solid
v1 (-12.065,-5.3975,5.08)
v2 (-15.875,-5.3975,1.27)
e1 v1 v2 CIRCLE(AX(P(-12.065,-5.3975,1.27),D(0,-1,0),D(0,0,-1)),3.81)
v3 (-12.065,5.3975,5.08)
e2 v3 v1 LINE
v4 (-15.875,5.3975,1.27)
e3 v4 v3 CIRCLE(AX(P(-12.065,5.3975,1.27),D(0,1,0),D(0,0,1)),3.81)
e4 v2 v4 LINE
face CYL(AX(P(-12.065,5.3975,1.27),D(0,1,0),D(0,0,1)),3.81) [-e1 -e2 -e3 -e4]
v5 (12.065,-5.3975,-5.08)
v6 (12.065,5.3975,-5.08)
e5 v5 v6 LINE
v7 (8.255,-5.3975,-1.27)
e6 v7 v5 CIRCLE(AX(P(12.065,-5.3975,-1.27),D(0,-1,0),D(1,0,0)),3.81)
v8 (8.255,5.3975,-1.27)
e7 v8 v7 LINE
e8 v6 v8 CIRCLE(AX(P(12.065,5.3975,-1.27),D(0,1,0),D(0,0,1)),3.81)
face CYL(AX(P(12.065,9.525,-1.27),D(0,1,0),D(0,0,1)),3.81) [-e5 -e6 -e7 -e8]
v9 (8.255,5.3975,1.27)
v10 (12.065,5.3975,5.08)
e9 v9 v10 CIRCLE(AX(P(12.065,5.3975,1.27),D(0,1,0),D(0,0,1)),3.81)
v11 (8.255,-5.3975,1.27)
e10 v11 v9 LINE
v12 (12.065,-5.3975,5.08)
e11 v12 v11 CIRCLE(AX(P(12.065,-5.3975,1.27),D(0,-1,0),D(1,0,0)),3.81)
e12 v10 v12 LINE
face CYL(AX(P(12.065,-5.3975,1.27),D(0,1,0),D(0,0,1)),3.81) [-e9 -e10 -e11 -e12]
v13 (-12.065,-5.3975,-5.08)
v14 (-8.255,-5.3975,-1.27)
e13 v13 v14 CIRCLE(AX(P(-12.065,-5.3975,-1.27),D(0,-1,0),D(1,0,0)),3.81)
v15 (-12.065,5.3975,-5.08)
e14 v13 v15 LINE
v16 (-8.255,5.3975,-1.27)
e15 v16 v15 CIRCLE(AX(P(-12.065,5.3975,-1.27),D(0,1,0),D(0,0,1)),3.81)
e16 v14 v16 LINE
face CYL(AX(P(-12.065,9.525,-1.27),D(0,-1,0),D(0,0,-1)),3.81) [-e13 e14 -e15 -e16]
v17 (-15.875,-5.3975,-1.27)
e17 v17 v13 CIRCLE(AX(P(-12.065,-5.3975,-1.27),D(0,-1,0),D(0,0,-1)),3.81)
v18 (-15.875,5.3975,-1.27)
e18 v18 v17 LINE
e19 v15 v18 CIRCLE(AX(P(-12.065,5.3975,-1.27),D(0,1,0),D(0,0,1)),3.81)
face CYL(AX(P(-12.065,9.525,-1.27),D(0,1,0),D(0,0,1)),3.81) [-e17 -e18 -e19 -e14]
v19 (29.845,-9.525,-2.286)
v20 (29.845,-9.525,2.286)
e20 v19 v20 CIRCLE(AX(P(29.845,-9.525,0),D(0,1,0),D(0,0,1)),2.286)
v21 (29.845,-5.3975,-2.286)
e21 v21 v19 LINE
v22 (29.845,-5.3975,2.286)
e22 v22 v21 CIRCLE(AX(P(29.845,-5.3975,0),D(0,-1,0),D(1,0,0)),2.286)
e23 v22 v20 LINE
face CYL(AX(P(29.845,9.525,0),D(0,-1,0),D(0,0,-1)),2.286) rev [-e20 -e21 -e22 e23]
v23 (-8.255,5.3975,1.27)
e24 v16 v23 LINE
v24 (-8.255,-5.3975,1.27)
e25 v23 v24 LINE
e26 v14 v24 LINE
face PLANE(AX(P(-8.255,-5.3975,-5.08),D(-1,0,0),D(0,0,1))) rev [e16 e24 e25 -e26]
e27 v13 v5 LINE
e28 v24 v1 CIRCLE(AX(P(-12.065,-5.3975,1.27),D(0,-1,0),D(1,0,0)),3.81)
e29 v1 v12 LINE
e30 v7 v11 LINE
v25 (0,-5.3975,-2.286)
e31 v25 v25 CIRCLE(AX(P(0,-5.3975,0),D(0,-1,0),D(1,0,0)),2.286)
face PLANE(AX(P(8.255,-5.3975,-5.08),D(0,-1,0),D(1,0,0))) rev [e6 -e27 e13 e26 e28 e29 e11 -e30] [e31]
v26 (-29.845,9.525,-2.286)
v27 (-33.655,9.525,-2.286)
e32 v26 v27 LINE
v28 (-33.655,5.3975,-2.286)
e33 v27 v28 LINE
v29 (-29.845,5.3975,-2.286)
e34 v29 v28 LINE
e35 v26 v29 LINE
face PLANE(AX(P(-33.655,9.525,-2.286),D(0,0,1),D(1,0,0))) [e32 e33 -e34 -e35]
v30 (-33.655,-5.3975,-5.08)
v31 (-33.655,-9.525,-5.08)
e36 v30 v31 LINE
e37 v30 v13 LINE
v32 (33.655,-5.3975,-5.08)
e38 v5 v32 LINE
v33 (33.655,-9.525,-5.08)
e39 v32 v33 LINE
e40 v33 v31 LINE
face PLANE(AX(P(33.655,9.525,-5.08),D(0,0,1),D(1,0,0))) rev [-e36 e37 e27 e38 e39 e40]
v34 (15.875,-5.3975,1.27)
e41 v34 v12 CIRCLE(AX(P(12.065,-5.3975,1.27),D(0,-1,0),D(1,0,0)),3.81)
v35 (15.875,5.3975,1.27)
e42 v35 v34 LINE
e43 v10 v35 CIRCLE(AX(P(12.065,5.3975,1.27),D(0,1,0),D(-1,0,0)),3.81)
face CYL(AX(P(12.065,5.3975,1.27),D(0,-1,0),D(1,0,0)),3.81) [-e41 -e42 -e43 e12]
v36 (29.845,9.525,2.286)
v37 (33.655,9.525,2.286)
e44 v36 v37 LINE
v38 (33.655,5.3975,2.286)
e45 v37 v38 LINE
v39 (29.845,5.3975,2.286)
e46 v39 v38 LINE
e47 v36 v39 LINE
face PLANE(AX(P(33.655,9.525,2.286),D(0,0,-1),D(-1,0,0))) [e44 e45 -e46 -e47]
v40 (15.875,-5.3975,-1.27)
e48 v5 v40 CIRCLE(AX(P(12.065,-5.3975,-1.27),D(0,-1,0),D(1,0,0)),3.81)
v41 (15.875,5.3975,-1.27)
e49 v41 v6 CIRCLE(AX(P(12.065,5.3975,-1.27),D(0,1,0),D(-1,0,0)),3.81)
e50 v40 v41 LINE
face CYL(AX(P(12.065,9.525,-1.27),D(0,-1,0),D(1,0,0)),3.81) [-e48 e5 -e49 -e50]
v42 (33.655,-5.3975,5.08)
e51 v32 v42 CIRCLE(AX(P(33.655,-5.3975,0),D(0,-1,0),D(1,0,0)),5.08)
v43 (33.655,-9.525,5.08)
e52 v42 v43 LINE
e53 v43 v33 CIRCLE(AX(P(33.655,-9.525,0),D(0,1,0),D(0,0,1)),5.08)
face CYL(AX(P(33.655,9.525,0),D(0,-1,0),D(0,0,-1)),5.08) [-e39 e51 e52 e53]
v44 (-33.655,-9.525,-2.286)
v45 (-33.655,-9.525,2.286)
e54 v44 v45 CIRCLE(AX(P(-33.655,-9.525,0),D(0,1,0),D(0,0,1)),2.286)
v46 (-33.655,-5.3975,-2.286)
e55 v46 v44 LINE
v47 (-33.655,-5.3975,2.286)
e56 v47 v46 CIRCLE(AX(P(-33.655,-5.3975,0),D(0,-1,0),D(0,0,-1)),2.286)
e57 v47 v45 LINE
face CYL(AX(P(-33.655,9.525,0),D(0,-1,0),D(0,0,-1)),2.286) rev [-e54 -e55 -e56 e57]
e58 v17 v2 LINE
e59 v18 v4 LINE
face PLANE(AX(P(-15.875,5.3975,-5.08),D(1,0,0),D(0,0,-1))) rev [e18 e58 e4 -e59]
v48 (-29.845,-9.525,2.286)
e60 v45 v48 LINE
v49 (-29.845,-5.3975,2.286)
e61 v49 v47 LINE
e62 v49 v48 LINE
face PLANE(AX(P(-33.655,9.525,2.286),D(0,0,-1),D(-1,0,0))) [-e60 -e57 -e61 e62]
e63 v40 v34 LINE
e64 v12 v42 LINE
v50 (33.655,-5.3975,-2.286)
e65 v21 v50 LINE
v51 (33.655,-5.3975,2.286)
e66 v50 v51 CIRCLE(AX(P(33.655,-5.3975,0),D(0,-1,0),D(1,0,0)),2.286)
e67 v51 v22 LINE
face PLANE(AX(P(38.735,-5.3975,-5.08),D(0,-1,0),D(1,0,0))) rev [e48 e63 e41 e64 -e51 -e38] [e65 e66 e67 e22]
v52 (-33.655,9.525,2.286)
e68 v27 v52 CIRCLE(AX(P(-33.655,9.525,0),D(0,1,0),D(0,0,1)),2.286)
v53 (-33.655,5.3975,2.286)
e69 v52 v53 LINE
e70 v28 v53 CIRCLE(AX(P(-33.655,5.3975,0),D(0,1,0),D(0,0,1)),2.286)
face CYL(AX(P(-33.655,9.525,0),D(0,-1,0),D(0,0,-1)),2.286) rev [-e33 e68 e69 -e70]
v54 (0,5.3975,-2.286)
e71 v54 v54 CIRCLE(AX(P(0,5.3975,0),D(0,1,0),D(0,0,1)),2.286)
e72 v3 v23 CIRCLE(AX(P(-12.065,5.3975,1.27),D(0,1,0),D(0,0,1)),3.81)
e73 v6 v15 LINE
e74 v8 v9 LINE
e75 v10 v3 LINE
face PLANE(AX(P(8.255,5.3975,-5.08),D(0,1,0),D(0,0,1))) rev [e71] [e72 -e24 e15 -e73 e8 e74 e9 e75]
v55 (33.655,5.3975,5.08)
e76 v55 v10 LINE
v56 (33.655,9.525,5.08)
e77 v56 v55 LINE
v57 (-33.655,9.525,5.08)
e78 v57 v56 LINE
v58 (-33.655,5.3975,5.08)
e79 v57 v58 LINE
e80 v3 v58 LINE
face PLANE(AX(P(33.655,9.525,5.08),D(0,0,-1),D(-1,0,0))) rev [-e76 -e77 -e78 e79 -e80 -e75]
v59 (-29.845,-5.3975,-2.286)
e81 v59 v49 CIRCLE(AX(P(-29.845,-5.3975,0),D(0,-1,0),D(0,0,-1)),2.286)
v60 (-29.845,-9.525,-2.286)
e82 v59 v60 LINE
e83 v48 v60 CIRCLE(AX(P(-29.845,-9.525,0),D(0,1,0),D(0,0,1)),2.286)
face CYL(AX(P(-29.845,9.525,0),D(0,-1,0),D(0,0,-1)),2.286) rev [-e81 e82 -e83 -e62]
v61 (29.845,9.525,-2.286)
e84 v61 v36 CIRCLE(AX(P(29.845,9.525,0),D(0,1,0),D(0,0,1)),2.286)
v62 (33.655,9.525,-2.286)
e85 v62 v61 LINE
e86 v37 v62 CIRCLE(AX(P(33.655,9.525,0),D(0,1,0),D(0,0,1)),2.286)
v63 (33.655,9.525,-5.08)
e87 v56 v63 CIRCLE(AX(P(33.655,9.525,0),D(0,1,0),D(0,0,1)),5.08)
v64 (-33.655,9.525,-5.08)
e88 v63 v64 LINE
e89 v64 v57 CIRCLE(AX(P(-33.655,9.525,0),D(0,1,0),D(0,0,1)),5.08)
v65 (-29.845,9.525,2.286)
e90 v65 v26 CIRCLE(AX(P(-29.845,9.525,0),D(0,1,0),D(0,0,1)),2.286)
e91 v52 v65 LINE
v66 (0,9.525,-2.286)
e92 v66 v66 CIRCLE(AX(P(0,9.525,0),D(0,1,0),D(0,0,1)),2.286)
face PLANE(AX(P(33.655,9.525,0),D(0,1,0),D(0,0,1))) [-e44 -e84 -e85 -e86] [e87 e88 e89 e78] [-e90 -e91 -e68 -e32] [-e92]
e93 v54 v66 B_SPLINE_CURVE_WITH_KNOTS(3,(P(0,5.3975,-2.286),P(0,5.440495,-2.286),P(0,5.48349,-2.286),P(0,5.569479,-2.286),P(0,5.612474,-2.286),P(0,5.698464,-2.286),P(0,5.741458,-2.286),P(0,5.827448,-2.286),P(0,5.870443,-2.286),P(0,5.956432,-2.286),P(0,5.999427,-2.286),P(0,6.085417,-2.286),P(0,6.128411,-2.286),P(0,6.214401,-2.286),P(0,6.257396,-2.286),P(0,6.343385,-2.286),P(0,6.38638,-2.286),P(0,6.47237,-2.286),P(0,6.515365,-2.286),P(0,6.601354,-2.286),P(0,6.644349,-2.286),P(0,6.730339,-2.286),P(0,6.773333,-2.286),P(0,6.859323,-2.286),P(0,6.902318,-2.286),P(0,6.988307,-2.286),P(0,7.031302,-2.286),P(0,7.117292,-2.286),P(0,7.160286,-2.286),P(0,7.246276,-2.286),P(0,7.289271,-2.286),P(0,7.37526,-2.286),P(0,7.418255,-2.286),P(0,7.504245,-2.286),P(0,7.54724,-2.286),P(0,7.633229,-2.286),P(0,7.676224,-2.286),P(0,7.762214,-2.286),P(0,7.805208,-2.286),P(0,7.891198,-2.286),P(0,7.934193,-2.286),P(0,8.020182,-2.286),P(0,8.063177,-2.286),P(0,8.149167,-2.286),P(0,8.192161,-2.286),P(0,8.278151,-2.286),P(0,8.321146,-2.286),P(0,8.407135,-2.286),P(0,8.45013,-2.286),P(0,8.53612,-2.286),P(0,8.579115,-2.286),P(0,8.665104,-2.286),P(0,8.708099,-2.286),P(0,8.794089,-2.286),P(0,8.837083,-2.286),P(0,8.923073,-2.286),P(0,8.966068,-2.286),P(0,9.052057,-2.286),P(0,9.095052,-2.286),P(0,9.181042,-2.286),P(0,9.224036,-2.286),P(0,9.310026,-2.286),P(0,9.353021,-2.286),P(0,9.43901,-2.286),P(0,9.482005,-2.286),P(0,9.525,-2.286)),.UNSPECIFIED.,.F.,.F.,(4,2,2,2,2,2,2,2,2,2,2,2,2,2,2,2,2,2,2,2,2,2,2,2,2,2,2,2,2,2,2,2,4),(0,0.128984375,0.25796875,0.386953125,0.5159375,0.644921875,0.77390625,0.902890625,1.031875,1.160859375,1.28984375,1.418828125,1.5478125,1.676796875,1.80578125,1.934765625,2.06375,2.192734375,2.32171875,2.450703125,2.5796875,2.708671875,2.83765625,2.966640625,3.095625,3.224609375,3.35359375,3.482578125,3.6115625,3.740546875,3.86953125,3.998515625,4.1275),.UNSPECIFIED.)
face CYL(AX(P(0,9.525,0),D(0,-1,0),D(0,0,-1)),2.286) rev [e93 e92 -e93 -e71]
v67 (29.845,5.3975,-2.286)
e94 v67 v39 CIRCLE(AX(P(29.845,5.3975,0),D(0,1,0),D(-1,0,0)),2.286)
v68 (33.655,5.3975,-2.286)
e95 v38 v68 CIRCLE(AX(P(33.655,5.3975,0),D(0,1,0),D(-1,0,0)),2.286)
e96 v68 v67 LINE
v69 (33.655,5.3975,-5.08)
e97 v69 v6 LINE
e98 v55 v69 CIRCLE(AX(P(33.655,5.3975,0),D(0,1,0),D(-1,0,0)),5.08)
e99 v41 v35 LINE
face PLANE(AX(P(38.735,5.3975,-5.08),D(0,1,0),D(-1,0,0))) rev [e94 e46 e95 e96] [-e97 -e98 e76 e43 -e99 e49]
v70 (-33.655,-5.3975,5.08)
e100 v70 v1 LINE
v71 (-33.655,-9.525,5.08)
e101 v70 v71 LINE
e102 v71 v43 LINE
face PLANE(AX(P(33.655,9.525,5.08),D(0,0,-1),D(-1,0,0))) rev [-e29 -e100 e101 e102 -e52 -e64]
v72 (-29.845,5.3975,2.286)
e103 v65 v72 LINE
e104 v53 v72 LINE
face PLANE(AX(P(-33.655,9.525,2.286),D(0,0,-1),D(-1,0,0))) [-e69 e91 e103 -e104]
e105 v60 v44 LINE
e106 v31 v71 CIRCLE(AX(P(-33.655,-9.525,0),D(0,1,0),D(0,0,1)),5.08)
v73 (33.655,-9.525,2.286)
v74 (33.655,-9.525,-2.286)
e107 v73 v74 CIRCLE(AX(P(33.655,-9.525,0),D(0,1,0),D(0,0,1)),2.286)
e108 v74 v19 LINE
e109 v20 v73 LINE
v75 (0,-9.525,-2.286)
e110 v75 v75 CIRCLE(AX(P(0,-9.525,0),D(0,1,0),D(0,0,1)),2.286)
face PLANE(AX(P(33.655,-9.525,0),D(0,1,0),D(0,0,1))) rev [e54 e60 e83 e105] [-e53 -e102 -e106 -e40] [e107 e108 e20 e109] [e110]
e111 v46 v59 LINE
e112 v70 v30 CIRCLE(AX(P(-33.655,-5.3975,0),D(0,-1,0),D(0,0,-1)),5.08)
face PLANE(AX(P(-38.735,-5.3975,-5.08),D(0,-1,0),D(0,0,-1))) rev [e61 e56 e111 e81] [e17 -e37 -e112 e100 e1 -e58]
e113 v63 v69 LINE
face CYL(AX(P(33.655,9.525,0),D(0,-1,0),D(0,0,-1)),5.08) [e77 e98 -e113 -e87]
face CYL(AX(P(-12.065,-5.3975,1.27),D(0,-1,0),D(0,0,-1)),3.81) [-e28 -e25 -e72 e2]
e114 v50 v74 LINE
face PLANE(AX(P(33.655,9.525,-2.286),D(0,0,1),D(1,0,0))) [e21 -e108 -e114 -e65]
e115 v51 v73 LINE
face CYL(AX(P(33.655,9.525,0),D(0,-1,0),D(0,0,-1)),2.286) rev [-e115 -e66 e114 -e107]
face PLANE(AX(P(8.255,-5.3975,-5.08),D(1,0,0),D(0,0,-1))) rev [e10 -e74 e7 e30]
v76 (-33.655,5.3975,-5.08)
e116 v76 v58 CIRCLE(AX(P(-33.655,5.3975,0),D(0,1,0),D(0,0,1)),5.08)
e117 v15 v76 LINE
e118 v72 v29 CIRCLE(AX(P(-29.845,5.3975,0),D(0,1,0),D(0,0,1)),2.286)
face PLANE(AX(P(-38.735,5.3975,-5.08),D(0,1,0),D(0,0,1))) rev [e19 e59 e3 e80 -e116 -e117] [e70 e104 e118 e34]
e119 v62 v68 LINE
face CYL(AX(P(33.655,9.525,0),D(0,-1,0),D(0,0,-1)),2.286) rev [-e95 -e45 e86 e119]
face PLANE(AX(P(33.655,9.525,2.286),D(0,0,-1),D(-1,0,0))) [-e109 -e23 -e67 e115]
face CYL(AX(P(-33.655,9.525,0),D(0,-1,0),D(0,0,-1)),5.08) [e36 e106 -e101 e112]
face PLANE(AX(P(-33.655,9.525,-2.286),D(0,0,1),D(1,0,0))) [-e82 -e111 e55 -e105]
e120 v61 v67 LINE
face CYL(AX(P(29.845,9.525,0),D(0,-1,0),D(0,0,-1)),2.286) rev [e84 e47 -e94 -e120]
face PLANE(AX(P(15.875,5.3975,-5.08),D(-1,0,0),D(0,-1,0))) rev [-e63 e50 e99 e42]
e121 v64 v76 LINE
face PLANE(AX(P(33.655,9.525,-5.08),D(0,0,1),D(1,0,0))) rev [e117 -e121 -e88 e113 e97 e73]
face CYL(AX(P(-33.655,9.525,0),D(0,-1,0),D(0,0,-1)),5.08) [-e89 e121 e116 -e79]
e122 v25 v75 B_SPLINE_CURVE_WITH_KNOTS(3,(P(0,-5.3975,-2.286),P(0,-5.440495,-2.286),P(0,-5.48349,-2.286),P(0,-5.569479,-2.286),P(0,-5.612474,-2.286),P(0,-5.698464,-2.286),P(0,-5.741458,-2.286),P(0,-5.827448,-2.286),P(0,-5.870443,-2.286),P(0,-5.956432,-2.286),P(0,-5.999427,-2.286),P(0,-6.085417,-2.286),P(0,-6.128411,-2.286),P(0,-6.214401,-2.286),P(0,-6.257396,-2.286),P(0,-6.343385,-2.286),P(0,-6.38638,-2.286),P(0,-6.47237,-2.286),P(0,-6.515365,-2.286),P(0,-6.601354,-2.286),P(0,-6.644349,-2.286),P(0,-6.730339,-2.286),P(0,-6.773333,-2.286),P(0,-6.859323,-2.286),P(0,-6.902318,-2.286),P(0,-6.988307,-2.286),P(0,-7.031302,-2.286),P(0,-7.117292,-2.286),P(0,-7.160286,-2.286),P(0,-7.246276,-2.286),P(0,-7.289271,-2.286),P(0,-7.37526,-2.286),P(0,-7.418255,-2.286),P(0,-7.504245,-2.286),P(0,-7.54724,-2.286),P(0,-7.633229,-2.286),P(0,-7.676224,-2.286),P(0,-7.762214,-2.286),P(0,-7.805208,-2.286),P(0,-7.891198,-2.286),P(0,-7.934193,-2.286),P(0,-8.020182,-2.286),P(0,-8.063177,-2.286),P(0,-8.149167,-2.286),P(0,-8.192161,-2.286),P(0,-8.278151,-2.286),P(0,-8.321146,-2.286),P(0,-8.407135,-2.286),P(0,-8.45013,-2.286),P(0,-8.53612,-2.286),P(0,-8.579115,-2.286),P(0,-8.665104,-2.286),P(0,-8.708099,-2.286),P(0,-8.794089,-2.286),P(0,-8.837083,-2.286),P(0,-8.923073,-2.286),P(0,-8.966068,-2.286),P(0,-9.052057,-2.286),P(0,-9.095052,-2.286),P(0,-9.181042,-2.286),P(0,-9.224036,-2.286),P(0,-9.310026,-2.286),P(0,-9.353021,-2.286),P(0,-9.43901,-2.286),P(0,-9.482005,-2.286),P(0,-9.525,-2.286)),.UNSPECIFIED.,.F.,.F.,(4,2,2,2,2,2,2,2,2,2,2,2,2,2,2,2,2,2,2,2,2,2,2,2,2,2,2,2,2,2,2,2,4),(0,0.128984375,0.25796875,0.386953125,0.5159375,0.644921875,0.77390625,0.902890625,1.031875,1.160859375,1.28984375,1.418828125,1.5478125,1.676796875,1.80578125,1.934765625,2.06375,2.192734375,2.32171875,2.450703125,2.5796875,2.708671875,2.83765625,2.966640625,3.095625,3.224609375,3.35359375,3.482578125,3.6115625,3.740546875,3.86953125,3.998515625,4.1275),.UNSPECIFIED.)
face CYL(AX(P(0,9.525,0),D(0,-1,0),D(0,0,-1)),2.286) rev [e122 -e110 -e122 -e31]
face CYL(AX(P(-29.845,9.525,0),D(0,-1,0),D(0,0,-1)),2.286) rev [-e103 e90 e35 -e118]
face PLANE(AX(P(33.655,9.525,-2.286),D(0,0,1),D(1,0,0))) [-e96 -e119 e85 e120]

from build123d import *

# Parameters (mm, degrees)
SKETCH1_R           = 2.286
BOSS_EXTRUDE1_DEPTH = 9.525
SKETCH3_W           = 22.86
SKETCH3_H           = 10.795
SKETCH3_W_2         = 16.51
CUT_EXTRUDE1_DEPTH  = 42.162500531
FILLET1_R           = 3.81


with BuildPart() as part:
    # Sketch1 → Boss-Extrude1 (new, symmetric)
    with BuildSketch(Plane(origin=(0, 0, 0), x_dir=(1, 0, 0), z_dir=(0, 1, 0))):
        with BuildLine():
            Line((33.655, -5.08), (-33.655, -5.08))
            ThreePointArc((-33.655, -5.08), (-38.735, 0), (-33.655, 5.08))
            Line((-33.655, 5.08), (33.655, 5.08))
            ThreePointArc((33.655, 5.08), (38.735, 0), (33.655, -5.08))
        make_face()
        with Locations(Location((0, 0, 0), (0, 0, 90))):
            Circle(SKETCH1_R, mode=Mode.SUBTRACT)
        with BuildLine():
            Line((33.655, -2.286), (29.845, -2.286))
            ThreePointArc((29.845, -2.286), (27.559, 0), (29.845, 2.286))
            Line((29.845, 2.286), (33.655, 2.286))
            ThreePointArc((33.655, 2.286), (35.941, 0), (33.655, -2.286))
        make_face(mode=Mode.SUBTRACT)
        with BuildLine():
            Line((-33.655, 2.286), (-29.845, 2.286))
            ThreePointArc((-29.845, 2.286), (-27.559, 0), (-29.845, -2.286))
            Line((-29.845, -2.286), (-33.655, -2.286))
            ThreePointArc((-33.655, -2.286), (-35.941, 0), (-33.655, 2.286))
        make_face(mode=Mode.SUBTRACT)
    extrude(amount=BOSS_EXTRUDE1_DEPTH, both=True)

    # Sketch3 → Cut-Extrude1 (cut, through all)
    with BuildSketch(Plane.XY.offset(5.08)):
        with Locations((-27.305, 0)):
            Rectangle(SKETCH3_W, SKETCH3_H)
        Rectangle(SKETCH3_W_2, SKETCH3_H)
        with Locations((27.305, 0)):
            Rectangle(SKETCH3_W, SKETCH3_H)
    extrude(amount=-CUT_EXTRUDE1_DEPTH, mode=Mode.SUBTRACT)

    # Fillet1
    fillet1_edges = [part.edges().sort_by_distance(p)[0] for p in [
        (15.875, 0, -5.08),
        (15.875, 0, 5.08),
        (-15.875, 0, 5.08),
        (-15.875, 0, -5.08),
        (-8.255, 0, -5.08),
        (8.255, 0, -5.08),
        (-8.255, 0, 5.08),
        (8.255, 0, 5.08),
    ]]
    fillet(fillet1_edges, radius=FILLET1_R - 0.0001)  # a hair under: the kernel refuses the full size


solid = part.part
